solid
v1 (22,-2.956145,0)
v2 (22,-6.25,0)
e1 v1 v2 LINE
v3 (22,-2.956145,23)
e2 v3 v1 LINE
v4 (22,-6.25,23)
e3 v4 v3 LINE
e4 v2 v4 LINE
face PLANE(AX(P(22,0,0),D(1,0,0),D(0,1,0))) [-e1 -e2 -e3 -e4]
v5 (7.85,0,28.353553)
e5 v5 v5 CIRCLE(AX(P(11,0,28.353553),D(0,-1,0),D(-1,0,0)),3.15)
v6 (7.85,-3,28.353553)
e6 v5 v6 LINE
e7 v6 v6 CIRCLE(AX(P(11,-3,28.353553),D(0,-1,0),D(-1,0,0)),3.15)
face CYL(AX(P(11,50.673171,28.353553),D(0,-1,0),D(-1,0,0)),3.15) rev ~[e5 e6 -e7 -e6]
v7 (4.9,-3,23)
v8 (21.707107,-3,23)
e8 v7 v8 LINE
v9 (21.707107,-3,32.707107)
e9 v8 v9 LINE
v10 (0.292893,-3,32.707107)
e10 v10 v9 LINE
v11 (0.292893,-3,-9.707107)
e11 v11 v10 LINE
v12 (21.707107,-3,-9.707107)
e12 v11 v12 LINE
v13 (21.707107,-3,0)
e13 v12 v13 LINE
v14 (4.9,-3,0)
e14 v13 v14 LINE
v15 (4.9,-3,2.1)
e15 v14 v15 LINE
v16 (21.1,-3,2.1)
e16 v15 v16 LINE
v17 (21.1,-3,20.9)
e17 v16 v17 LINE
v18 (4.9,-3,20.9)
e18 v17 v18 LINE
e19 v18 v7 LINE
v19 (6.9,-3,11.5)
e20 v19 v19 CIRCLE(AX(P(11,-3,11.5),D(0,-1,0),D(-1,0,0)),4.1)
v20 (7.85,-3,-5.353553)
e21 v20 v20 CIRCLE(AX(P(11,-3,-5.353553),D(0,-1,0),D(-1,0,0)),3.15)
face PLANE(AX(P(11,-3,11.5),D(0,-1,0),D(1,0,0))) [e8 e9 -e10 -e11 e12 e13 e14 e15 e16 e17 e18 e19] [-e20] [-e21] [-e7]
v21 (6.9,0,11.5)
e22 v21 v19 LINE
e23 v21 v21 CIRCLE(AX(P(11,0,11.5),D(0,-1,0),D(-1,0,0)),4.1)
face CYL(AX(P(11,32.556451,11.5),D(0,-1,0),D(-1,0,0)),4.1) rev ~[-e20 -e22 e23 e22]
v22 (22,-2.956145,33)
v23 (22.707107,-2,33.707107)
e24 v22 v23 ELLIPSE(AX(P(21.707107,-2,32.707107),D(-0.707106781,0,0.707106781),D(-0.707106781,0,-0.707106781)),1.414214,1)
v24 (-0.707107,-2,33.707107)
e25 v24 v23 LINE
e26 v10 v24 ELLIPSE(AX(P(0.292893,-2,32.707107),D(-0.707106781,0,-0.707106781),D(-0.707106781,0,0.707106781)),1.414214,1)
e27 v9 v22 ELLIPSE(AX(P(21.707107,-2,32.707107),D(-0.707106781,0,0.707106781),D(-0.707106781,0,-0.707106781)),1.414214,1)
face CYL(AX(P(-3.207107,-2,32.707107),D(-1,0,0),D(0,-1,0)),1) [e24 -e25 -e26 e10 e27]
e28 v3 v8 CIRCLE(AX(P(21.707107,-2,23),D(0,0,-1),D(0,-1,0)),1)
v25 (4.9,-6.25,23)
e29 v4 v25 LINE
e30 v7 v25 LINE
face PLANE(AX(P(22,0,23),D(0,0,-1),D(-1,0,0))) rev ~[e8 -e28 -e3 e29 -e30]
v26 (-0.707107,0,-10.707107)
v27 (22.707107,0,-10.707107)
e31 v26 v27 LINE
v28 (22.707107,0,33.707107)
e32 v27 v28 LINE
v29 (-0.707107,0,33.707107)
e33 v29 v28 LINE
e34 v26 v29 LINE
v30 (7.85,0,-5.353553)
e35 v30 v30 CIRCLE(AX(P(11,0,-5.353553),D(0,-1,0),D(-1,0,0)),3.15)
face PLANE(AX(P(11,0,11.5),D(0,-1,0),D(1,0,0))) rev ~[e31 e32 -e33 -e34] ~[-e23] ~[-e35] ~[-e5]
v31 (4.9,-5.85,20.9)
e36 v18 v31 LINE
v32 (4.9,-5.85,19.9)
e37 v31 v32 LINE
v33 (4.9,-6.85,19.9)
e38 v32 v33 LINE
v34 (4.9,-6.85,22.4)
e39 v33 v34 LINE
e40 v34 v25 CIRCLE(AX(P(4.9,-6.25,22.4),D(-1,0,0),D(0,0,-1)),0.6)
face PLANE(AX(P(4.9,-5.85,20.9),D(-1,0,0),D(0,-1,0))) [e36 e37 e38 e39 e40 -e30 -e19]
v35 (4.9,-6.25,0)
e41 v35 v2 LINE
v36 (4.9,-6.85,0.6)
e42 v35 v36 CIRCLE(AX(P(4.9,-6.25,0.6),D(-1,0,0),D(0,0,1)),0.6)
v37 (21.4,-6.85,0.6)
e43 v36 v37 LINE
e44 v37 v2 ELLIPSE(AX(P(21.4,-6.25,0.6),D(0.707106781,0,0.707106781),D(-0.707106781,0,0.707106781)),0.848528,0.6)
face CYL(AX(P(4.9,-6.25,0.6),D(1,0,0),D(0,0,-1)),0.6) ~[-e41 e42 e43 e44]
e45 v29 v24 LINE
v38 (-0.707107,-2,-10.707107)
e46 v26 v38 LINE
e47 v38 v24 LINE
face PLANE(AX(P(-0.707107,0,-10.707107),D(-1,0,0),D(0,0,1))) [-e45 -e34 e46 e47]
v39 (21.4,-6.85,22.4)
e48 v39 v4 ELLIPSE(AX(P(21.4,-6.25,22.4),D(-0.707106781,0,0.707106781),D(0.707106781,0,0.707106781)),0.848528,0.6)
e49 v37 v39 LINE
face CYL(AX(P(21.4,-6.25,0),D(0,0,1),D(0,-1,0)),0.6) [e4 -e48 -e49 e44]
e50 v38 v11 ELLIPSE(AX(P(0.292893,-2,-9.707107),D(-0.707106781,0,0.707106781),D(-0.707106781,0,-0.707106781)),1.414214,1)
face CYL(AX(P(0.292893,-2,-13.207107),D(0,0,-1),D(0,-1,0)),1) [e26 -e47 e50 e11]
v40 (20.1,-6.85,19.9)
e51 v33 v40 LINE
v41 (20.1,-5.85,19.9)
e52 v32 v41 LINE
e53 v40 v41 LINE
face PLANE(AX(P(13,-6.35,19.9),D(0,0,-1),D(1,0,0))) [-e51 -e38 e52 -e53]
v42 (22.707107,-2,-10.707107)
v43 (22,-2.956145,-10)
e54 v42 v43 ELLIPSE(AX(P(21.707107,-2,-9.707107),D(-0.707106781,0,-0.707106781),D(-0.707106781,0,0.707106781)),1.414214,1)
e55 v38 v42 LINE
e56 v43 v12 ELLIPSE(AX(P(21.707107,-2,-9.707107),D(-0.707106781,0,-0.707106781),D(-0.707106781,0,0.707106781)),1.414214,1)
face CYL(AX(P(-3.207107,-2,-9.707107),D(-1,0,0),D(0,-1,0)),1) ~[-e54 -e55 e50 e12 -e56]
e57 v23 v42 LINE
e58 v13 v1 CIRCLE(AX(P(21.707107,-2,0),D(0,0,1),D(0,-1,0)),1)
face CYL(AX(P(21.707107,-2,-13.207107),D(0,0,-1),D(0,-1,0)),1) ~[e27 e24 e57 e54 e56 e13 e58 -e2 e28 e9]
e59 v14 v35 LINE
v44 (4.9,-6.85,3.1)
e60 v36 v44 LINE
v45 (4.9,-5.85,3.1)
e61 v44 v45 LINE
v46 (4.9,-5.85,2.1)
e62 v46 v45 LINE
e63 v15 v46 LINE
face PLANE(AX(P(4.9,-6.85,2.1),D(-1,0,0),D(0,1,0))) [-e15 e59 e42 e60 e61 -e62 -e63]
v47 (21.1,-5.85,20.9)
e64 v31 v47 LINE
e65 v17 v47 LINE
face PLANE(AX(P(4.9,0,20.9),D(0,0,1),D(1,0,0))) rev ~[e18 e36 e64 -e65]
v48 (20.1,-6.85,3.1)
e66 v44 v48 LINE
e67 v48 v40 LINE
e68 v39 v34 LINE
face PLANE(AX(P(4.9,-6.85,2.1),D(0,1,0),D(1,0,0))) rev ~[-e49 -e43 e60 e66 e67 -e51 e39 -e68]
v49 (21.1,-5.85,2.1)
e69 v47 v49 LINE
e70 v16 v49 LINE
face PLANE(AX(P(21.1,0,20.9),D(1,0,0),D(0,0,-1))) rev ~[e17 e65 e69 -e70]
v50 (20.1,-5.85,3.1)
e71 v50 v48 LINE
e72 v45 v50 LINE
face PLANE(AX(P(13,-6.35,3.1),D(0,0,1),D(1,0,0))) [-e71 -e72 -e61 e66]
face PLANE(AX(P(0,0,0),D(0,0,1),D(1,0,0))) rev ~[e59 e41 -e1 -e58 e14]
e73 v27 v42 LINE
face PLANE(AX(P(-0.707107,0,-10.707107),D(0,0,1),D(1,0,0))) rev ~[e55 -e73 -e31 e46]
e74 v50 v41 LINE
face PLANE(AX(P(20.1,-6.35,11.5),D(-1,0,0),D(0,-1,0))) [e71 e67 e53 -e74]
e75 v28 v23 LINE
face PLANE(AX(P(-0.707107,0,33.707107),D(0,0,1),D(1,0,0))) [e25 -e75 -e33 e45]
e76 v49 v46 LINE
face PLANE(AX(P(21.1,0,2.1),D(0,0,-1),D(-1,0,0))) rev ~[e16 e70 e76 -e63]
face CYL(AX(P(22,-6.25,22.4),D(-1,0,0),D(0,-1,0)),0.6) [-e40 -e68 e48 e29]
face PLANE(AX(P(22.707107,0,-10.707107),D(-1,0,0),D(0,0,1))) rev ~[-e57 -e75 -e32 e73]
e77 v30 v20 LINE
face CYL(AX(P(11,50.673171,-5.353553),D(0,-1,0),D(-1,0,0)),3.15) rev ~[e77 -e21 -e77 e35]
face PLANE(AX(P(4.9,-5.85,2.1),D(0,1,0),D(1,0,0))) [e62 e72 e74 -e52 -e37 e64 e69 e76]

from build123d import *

# Parameters (mm, degrees)
F1_DEPTH      = 3
F2_DEPTH      = 6.85
F6_DEPTH      = 3
F3_W          = 16.2
F3_H          = 1
F7_DEPTH      = 1
F5_W          = 16.2
F5_H          = 1
F8_DEPTH      = 1
F4_W          = 1
F4_H          = 18.8
F9_DEPTH      = 1
F10_D         = 8.2
F0_W          = 23.4142135624
F0_H          = 44.4142135624
F11_DEPTH     = 3
F12_T1_DEPTH  = 28.4142135624
F12_T3_DEPTH  = 49.4142135624
F12_T8_DEPTH  = 49.4142135624
F12_T14_DEPTH = 49.4142135624
F12_T20_DEPTH = 49.4142135624
F12_T27_DEPTH = 49.4142135624
F12_T33_DEPTH = 49.4142135624
F13_R         = 0.6
F14_D         = 6.3


# Not quite as in the source:
# - a fillet or chamfer that OpenCascade refuses, or shapes differently, is made with other operations: its cross-section is extruded or revolved along the edge and cut away or added
# - a feature names something its author has since deleted; it is built from what else it names


with BuildPart() as f1:
    # F0 (on Front) → F1 (new body)
    with BuildSketch(Plane.XZ):
        Polygon((0.9, 2.1), (4.9, 2.1), (21.1, 2.1), (21.1, 20.9), (4.9, 20.9), (0.9, 20.9), align=None)
        Polygon((0, 23), (0, 0), (4.9, 0), (4.9, 2.1), (0.9, 2.1), (0.9, 20.9), (4.9, 20.9), (4.9, 23), align=None)
        Polygon((4.9, 2.1), (4.9, 0), (22, 0), (22, 23), (4.9, 23), (4.9, 20.9), (21.1, 20.9), (21.1, 2.1), align=None)
    extrude(amount=F1_DEPTH)

    # F0 (on Front) → F2 (join)
    with BuildSketch(Plane.XZ):
        Polygon((4.9, 2.1), (4.9, 0), (22, 0), (22, 23), (4.9, 23), (4.9, 20.9), (21.1, 20.9), (21.1, 2.1), align=None)
    extrude(amount=F2_DEPTH)

    # F0 (on Front) → F6 (join)
    with BuildSketch(Plane.XZ):
        Polygon((0, 23), (0, 0), (4.9, 0), (4.9, 2.1), (0.9, 2.1), (0.9, 20.9), (4.9, 20.9), (4.9, 23), align=None)
    extrude(amount=F6_DEPTH)

    # F3 (on face) → F7 (join)
    with BuildSketch(Plane(origin=(0, 0, 20.9), x_dir=(1, 0, 0), z_dir=(0, 0, -1))):
        with Locations((13, 6.35)):
            Rectangle(F3_W, F3_H)
    extrude(amount=F7_DEPTH)

    # F5 (on face) → F8 (join)
    with BuildSketch(Plane.XY.offset(2.1)):
        with Locations((13, -6.35)):
            Rectangle(F5_W, F5_H)
    extrude(amount=F8_DEPTH)

    # F4 (on face) → F9 (join)
    with BuildSketch(Plane(origin=(21.1, 0, 0), x_dir=(0, -1, 0), z_dir=(-1, 0, 0))):
        with Locations((6.35, 11.5)):
            Rectangle(F4_W, F4_H)
    extrude(amount=F9_DEPTH)

    # F10 (through all)
    with Locations(Plane(origin=(0, 0, 0), x_dir=(1, 0, 0), z_dir=(0, 1, 0))):
        with Locations((11, -11.5)):
            Hole(F10_D / 2)

    # F0 (on Front) → F11 (join)
    with BuildSketch(Plane.XZ):
        with Locations((11, 11.5)):
            Rectangle(F0_W, F0_H)
        Polygon((4.9, 0), (0, 0), (0, 23), (4.9, 23), (22, 23), (22, 0), align=None, mode=Mode.SUBTRACT)
    extrude(amount=F11_DEPTH)

    # F12: fillet of radius 1 on 4 edges, made by hand

    # F12_s2 → F12_t1 (cut)
    with BuildSketch(Plane.YZ.offset(-3.2071067812)):
        with BuildLine():
            ThreePointArc((-3, -9.7071067812), (-2.7071067812, -10.4142135624), (-2, -10.7071067812))
            Line((-2, -10.7071067812), (-3, -10.7071067812))
            Line((-3, -10.7071067812), (-3, -9.7071067812))
        make_face()
        with BuildLine():
            ThreePointArc((-3, 32.7071067812), (-2.7071067812, 33.4142135624), (-2, 33.7071067812))
            Line((-2, 33.7071067812), (-3, 33.7071067812))
            Line((-3, 33.7071067812), (-3, 32.7071067812))
        make_face()
    extrude(amount=F12_T1_DEPTH, mode=Mode.SUBTRACT)

    # F12_s4 → F12_t3 (cut)
    with BuildSketch(Plane.XY.offset(-13.2071067812)):
        with BuildLine():
            ThreePointArc((0.2928932188, -3), (-0.4142135624, -2.7071067812), (-0.7071067812, -2))
            Line((-0.7071067812, -2), (-0.7071067812, -3))
            Line((-0.7071067812, -3), (0.2928932188, -3))
        make_face()
    extrude(amount=F12_T3_DEPTH, mode=Mode.SUBTRACT)


with BuildPart() as f12_tool6:
    # F12_s7 → F12_t8 (new body)
    with BuildSketch(Plane.XY.offset(-13.2071067812)):
        with BuildLine():
            ThreePointArc((21.7071067812, -3), (22.4142135624, -2.7071067812), (22.7071067812, -2))
            Line((22.7071067812, -2), (22.7071067812, -3))
            Line((22.7071067812, -3), (21.7071067812, -3))
        make_face()
    extrude(amount=F12_T8_DEPTH)

    split(bisect_by=Plane.XY, keep=Keep.BOTTOM)

    split(bisect_by=Plane.YZ.offset(22), keep=Keep.BOTTOM)


with BuildPart() as f1_1:
    add(f1.part)

    # F12_t5: cut F12_tool6
    add(f12_tool6.part, mode=Mode.SUBTRACT)


with BuildPart() as f12_tool12:
    # F12_s13 → F12_t14 (new body)
    with BuildSketch(Plane.XY.offset(-13.2071067812)):
        with BuildLine():
            ThreePointArc((21.7071067812, -3), (22.4142135624, -2.7071067812), (22.7071067812, -2))
            Line((22.7071067812, -2), (22.7071067812, -3))
            Line((22.7071067812, -3), (21.7071067812, -3))
        make_face()
    extrude(amount=F12_T14_DEPTH)

    split(bisect_by=Plane.XY, keep=Keep.BOTTOM)

    split(bisect_by=Plane.YZ.offset(22), keep=Keep.TOP)


with BuildPart() as f1_2:
    add(f1_1.part)

    # F12_t11: cut F12_tool12
    add(f12_tool12.part, mode=Mode.SUBTRACT)


with BuildPart() as f12_tool18:
    # F12_s19 → F12_t20 (new body)
    with BuildSketch(Plane.XY.offset(-13.2071067812)):
        with BuildLine():
            ThreePointArc((21.7071067812, -3), (22.4142135624, -2.7071067812), (22.7071067812, -2))
            Line((22.7071067812, -2), (22.7071067812, -3))
            Line((22.7071067812, -3), (21.7071067812, -3))
        make_face()
    extrude(amount=F12_T20_DEPTH)

    split(bisect_by=Plane.XY.offset(23), keep=Keep.BOTTOM)

    split(bisect_by=Plane.XY, keep=Keep.TOP)

    split(bisect_by=Plane.YZ.offset(22), keep=Keep.TOP)


with BuildPart() as f1_3:
    add(f1_2.part)

    # F12_t17: cut F12_tool18
    add(f12_tool18.part, mode=Mode.SUBTRACT)


with BuildPart() as f12_tool25:
    # F12_s26 → F12_t27 (new body)
    with BuildSketch(Plane.XY.offset(-13.2071067812)):
        with BuildLine():
            ThreePointArc((21.7071067812, -3), (22.4142135624, -2.7071067812), (22.7071067812, -2))
            Line((22.7071067812, -2), (22.7071067812, -3))
            Line((22.7071067812, -3), (21.7071067812, -3))
        make_face()
    extrude(amount=F12_T27_DEPTH)

    split(bisect_by=Plane.XY.offset(23), keep=Keep.TOP)

    split(bisect_by=Plane.YZ.offset(22), keep=Keep.BOTTOM)


with BuildPart() as f1_4:
    add(f1_3.part)

    # F12_t24: cut F12_tool25
    add(f12_tool25.part, mode=Mode.SUBTRACT)


with BuildPart() as f12_tool31:
    # F12_s32 → F12_t33 (new body)
    with BuildSketch(Plane.XY.offset(-13.2071067812)):
        with BuildLine():
            ThreePointArc((21.7071067812, -3), (22.4142135624, -2.7071067812), (22.7071067812, -2))
            Line((22.7071067812, -2), (22.7071067812, -3))
            Line((22.7071067812, -3), (21.7071067812, -3))
        make_face()
    extrude(amount=F12_T33_DEPTH)

    split(bisect_by=Plane.XY.offset(23), keep=Keep.TOP)

    split(bisect_by=Plane.YZ.offset(22), keep=Keep.TOP)


with BuildPart() as f1_5:
    add(f1_4.part)

    # F12_t30: cut F12_tool31
    add(f12_tool31.part, mode=Mode.SUBTRACT)

    # F13
    f13_edges = [f1_5.edges().sort_by_distance(p)[0] for p in [
        (22, -6.85, 11.5),
        (13.45, -6.85, 0),
        (13.45, -6.85, 23),
    ]]
    fillet(f13_edges, radius=F13_R)

    # F14 (through all)
    with Locations(Plane(origin=(0, 0, 0), x_dir=(1, 0, 0), z_dir=(0, 1, 0))):
        with Locations((11, -28.3535533906), (11, 5.3535533906)):
            Hole(F14_D / 2)


solid = f1_5.part
